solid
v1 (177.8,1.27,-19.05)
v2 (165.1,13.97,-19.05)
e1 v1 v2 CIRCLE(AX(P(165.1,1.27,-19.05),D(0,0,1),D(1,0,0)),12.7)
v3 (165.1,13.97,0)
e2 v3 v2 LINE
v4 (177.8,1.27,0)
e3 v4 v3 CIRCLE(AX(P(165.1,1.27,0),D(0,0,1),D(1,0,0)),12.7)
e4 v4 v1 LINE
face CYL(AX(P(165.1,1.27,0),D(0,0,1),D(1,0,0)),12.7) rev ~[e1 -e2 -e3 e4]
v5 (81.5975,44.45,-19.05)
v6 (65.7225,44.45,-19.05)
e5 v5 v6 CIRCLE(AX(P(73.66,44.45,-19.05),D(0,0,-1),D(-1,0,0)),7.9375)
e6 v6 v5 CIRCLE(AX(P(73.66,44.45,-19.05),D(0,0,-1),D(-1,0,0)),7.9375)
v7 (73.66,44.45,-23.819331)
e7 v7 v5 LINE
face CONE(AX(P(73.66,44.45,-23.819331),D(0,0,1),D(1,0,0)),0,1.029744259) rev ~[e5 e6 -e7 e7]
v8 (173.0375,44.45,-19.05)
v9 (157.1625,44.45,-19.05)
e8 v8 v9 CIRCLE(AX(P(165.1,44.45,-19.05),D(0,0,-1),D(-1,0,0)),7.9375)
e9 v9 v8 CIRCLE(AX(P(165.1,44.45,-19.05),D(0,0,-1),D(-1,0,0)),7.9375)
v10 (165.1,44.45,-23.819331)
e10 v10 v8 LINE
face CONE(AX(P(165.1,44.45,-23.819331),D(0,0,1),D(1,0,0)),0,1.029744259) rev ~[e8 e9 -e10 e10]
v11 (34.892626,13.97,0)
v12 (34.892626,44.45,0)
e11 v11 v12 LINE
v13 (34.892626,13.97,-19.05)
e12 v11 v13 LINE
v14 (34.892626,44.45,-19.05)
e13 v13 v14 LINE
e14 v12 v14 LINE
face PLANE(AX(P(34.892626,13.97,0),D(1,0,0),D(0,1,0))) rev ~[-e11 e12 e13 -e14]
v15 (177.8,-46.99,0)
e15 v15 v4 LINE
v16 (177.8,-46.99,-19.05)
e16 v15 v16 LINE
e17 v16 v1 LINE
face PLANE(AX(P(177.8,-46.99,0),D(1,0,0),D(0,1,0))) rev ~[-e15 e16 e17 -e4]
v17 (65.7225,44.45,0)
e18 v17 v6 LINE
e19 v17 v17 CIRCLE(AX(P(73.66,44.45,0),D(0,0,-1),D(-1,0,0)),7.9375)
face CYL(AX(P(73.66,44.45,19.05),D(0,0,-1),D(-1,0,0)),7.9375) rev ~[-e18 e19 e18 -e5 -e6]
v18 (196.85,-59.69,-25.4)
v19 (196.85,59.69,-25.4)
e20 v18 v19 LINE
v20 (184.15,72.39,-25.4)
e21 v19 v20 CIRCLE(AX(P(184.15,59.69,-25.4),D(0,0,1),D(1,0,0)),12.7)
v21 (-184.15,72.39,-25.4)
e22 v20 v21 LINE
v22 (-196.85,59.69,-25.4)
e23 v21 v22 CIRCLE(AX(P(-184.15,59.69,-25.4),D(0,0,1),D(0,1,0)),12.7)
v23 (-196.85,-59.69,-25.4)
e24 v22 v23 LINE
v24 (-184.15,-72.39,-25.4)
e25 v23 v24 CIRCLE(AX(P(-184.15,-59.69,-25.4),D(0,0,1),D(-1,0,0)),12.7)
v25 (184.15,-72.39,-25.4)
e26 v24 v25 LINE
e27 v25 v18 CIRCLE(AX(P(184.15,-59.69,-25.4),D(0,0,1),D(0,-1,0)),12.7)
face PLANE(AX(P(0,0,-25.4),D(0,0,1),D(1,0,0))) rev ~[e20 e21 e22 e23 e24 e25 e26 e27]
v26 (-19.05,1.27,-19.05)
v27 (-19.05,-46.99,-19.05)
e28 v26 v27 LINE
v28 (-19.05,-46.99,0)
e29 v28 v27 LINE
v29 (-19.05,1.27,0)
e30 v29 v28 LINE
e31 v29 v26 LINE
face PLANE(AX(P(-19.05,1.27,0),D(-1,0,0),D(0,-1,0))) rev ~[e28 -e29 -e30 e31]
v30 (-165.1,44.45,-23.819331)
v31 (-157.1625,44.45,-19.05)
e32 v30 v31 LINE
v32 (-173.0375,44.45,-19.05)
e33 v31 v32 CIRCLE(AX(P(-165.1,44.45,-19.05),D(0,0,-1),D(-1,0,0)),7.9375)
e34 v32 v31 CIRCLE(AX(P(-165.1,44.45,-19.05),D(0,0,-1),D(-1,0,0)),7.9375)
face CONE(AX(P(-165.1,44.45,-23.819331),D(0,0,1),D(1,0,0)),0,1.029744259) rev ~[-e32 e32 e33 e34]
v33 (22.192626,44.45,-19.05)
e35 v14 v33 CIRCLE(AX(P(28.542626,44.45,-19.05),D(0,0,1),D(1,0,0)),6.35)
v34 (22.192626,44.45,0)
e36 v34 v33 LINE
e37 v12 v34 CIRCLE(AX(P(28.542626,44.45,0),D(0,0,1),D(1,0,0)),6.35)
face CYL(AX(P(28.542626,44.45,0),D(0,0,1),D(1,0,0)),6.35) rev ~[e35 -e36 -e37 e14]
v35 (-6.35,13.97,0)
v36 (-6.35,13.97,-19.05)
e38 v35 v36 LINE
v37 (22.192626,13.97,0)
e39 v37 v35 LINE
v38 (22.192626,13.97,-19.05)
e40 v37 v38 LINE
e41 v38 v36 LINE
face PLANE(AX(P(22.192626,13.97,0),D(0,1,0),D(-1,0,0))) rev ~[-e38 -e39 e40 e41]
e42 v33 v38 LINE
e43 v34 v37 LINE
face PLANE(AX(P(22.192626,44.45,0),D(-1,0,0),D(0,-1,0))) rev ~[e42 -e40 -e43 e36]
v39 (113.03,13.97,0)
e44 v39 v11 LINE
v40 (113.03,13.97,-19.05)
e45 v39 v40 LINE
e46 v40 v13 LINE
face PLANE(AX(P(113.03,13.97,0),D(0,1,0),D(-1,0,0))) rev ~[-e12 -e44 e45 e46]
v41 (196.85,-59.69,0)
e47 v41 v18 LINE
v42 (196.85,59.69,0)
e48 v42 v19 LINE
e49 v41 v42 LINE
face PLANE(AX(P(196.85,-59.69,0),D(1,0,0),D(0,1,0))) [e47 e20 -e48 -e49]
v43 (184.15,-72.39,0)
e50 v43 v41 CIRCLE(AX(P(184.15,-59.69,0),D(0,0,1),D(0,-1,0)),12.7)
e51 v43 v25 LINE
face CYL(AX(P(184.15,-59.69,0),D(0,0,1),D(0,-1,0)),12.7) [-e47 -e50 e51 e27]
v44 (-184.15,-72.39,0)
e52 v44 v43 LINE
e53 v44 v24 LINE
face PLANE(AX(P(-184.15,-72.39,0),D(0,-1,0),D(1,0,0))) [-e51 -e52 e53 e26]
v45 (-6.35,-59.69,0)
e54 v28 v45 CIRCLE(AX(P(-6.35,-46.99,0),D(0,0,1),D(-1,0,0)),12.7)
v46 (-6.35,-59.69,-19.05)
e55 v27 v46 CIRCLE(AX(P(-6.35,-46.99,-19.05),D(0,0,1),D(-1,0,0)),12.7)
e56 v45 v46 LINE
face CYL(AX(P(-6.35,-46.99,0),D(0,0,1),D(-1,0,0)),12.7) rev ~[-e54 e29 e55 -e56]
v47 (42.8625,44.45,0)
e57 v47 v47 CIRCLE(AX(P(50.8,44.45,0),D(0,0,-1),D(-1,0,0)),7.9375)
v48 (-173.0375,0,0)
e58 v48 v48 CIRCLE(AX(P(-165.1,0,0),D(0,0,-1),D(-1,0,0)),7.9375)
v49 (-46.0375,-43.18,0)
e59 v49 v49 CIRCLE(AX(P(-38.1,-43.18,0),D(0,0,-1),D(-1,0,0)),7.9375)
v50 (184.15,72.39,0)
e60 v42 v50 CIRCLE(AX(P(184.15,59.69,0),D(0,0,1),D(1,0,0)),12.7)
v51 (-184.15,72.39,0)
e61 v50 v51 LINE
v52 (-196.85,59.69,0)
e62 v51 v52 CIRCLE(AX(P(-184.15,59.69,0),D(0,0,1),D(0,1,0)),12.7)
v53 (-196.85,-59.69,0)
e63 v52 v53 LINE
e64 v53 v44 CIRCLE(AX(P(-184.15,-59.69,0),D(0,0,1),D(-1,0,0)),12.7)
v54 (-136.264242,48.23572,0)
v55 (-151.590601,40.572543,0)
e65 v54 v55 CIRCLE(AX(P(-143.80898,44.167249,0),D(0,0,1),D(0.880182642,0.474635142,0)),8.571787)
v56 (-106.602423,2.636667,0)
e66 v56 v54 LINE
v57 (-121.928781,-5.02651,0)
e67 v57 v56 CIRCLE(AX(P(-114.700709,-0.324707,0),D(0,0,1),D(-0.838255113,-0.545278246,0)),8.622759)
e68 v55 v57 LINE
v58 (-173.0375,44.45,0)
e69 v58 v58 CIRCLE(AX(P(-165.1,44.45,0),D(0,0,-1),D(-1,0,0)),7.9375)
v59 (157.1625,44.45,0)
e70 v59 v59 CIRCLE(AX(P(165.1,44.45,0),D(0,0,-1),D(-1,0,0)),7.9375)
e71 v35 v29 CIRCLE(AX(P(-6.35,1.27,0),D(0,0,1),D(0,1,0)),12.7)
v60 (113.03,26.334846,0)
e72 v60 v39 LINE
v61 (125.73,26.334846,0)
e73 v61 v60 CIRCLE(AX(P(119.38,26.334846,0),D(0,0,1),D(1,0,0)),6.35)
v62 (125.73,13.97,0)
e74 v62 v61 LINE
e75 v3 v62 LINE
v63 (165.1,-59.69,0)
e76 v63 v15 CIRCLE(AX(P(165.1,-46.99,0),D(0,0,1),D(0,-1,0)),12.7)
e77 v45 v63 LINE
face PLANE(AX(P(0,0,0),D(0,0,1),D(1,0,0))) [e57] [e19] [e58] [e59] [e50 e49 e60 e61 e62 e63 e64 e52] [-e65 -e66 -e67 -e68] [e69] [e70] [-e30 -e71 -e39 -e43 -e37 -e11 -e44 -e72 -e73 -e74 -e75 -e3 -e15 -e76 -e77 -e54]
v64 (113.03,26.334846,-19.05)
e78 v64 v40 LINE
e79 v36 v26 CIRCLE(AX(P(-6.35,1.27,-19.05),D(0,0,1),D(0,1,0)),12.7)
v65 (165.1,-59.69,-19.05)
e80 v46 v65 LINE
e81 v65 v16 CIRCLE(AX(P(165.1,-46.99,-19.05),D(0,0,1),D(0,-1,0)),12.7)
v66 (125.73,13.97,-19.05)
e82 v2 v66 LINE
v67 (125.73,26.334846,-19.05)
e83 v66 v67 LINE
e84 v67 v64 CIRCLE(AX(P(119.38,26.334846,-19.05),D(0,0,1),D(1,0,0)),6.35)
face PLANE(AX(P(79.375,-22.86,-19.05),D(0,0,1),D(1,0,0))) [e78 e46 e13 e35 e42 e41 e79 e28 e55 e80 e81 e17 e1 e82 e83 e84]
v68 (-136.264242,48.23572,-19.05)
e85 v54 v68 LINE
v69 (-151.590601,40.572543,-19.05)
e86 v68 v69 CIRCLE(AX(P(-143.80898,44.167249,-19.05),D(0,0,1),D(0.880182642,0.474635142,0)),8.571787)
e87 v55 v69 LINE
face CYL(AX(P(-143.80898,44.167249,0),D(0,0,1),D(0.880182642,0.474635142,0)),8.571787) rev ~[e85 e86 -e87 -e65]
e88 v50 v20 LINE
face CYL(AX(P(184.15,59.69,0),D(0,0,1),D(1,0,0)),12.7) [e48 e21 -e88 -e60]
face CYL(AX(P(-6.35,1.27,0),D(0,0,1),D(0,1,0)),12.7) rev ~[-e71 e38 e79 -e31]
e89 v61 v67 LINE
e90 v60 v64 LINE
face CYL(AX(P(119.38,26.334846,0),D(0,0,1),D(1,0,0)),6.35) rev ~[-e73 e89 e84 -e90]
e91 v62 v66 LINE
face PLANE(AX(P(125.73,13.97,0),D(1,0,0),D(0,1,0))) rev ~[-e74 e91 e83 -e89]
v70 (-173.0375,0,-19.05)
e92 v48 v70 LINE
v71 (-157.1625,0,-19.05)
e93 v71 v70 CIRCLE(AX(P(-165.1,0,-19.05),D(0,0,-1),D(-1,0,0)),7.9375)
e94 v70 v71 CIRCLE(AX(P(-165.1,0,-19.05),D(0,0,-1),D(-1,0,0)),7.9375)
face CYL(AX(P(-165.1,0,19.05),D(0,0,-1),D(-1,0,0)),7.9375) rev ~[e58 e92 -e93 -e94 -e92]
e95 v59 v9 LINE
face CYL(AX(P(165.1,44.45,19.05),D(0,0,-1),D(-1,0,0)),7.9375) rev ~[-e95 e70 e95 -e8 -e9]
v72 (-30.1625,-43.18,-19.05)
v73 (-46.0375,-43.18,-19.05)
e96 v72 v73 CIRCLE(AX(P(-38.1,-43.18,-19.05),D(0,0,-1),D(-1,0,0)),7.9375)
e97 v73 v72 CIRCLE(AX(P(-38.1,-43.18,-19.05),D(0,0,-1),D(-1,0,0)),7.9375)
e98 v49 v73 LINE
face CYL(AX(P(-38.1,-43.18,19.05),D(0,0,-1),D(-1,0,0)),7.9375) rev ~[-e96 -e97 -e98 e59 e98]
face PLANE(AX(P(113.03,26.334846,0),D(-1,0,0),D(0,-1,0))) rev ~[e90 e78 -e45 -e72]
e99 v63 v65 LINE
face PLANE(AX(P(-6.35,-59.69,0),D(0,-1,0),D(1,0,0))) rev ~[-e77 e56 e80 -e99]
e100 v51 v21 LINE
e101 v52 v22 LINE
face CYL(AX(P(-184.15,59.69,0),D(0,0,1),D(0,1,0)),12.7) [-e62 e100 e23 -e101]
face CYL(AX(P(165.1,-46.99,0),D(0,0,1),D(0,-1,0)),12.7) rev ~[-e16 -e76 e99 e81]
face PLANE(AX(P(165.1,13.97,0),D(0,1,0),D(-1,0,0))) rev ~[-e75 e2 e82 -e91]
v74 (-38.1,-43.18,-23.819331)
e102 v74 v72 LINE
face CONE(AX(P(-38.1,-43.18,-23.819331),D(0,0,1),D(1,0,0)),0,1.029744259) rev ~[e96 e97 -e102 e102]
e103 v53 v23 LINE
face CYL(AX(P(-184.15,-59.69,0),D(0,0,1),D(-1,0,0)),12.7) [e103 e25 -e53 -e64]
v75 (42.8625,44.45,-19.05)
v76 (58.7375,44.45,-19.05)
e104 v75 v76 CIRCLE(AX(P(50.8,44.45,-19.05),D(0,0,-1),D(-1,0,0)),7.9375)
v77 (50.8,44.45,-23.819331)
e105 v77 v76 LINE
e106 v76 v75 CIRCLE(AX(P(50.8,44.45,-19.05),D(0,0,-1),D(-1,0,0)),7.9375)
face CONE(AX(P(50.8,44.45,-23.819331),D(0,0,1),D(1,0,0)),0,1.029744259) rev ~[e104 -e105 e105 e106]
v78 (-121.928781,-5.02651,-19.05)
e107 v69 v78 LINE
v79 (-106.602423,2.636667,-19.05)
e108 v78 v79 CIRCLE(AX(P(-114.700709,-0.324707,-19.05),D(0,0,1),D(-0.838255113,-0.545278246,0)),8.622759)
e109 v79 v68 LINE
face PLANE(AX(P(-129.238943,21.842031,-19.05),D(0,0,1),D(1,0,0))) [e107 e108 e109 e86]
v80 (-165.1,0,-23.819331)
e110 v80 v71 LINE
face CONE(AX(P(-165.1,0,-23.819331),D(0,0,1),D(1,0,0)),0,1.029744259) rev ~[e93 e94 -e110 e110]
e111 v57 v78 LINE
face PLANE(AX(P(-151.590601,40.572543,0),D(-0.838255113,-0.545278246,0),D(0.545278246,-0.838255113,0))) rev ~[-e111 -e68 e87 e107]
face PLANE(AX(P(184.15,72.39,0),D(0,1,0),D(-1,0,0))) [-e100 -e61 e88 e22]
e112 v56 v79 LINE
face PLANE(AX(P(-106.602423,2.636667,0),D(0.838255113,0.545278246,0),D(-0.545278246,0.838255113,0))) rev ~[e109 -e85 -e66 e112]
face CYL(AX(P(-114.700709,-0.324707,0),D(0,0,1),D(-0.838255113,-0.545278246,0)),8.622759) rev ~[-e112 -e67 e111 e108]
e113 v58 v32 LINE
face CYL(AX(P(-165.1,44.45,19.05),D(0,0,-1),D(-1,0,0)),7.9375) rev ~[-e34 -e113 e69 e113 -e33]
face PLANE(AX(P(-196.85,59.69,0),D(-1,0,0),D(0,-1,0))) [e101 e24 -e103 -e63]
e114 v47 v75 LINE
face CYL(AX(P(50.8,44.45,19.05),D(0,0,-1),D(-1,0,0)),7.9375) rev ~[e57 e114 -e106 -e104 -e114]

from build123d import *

# Parameters (mm, degrees)
F1_DEPTH = 25.4
F3_DEPTH = 19.05
F4_D     = 15.875
F4_DEPTH = 19.05
F4_TIP   = 4.7693311635


# Not quite as in the source:
# - a length typed as a fraction of an inch, garbled in the dataset ("3 / 203.2 mm" for 3/8 in), is restored


with BuildPart() as f1:
    # F0 (on Top) → F1 (new body)
    with BuildSketch(Plane.XY):
        with BuildLine():
            ThreePointArc((-196.85, -59.69), (-193.1302561211, -68.6702561211), (-184.15, -72.39))
            Line((-184.15, -72.39), (184.15, -72.39))
            ThreePointArc((184.15, -72.39), (193.1302561211, -68.6702561211), (196.85, -59.69))
            Line((196.85, -59.69), (196.85, 59.69))
            ThreePointArc((196.85, 59.69), (193.1302561211, 68.6702561211), (184.15, 72.39))
            Line((184.15, 72.39), (-184.15, 72.39))
            ThreePointArc((-184.15, 72.39), (-193.1302561211, 68.6702561211), (-196.85, 59.69))
            Line((-196.85, 59.69), (-196.85, -59.69))
        make_face()
    extrude(amount=-F1_DEPTH)

    # F2 (on Top) → F3 (cut)
    with BuildSketch(Plane.XY):
        with BuildLine():
            Line((22.1926261067, 13.97), (-6.35, 13.97))
            ThreePointArc((-6.35, 13.97), (-15.3302561211, 10.2502561211), (-19.05, 1.27))
            Line((-19.05, 1.27), (-19.05, -46.99))
            ThreePointArc((-19.05, -46.99), (-15.3302561211, -55.9702561211), (-6.35, -59.69))
            Line((-6.35, -59.69), (165.1, -59.69))
            ThreePointArc((165.1, -59.69), (174.0802561211, -55.9702561211), (177.8, -46.99))
            Line((177.8, -46.99), (177.8, 1.27))
            ThreePointArc((177.8, 1.27), (174.0802561211, 10.2502561211), (165.1, 13.97))
            Line((165.1, 13.97), (125.73, 13.97))
            Line((125.73, 13.97), (113.03, 13.97))
            Line((113.03, 13.97), (34.8926261067, 13.97))
            Line((34.8926261067, 13.97), (22.1926261067, 13.97))
        make_face()
        with BuildLine():
            Line((22.1926261067, 44.45), (22.1926261067, 13.97))
            Line((22.1926261067, 13.97), (34.8926261067, 13.97))
            Line((34.8926261067, 13.97), (34.8926261067, 44.45))
            ThreePointArc((34.8926261067, 44.45), (28.5426261067, 50.8), (22.1926261067, 44.45))
        make_face()
        with BuildLine():
            Line((113.03, 26.3348463923), (113.03, 13.97))
            Line((113.03, 13.97), (125.73, 13.97))
            Line((125.73, 13.97), (125.73, 26.3348463923))
            ThreePointArc((125.73, 26.3348463923), (119.38, 32.6848463923), (113.03, 26.3348463923))
        make_face()
        with BuildLine():
            ThreePointArc((-136.2642422318, 48.2357204892), (-147.6423993224, 51.8340887509), (-151.5906006098, 40.5725426972))
            Line((-151.5906006098, 40.5725426972), (-121.928781271, -5.026510451))
            ThreePointArc((-121.928781271, -5.026510451), (-110.8444944433, -8.0371380797), (-106.602422893, 2.636667341))
            Line((-106.602422893, 2.636667341), (-136.2642422318, 48.2357204892))
        make_face()
    extrude(amount=-F3_DEPTH, mode=Mode.SUBTRACT)

    # F4
    with Locations(Plane.XY):
        with Locations((-165.1, 44.45), (50.8, 44.45), (73.66, 44.45), (165.1, 44.45), (-165.1, 0), (-38.1, -43.18)):
            Hole(F4_D / 2, depth=F4_DEPTH)
            with Locations((0, 0, -(F4_DEPTH + F4_TIP / 2))):  # 118° drill point
                Cone(0, F4_D / 2, F4_TIP, mode=Mode.SUBTRACT)


solid = f1.part
